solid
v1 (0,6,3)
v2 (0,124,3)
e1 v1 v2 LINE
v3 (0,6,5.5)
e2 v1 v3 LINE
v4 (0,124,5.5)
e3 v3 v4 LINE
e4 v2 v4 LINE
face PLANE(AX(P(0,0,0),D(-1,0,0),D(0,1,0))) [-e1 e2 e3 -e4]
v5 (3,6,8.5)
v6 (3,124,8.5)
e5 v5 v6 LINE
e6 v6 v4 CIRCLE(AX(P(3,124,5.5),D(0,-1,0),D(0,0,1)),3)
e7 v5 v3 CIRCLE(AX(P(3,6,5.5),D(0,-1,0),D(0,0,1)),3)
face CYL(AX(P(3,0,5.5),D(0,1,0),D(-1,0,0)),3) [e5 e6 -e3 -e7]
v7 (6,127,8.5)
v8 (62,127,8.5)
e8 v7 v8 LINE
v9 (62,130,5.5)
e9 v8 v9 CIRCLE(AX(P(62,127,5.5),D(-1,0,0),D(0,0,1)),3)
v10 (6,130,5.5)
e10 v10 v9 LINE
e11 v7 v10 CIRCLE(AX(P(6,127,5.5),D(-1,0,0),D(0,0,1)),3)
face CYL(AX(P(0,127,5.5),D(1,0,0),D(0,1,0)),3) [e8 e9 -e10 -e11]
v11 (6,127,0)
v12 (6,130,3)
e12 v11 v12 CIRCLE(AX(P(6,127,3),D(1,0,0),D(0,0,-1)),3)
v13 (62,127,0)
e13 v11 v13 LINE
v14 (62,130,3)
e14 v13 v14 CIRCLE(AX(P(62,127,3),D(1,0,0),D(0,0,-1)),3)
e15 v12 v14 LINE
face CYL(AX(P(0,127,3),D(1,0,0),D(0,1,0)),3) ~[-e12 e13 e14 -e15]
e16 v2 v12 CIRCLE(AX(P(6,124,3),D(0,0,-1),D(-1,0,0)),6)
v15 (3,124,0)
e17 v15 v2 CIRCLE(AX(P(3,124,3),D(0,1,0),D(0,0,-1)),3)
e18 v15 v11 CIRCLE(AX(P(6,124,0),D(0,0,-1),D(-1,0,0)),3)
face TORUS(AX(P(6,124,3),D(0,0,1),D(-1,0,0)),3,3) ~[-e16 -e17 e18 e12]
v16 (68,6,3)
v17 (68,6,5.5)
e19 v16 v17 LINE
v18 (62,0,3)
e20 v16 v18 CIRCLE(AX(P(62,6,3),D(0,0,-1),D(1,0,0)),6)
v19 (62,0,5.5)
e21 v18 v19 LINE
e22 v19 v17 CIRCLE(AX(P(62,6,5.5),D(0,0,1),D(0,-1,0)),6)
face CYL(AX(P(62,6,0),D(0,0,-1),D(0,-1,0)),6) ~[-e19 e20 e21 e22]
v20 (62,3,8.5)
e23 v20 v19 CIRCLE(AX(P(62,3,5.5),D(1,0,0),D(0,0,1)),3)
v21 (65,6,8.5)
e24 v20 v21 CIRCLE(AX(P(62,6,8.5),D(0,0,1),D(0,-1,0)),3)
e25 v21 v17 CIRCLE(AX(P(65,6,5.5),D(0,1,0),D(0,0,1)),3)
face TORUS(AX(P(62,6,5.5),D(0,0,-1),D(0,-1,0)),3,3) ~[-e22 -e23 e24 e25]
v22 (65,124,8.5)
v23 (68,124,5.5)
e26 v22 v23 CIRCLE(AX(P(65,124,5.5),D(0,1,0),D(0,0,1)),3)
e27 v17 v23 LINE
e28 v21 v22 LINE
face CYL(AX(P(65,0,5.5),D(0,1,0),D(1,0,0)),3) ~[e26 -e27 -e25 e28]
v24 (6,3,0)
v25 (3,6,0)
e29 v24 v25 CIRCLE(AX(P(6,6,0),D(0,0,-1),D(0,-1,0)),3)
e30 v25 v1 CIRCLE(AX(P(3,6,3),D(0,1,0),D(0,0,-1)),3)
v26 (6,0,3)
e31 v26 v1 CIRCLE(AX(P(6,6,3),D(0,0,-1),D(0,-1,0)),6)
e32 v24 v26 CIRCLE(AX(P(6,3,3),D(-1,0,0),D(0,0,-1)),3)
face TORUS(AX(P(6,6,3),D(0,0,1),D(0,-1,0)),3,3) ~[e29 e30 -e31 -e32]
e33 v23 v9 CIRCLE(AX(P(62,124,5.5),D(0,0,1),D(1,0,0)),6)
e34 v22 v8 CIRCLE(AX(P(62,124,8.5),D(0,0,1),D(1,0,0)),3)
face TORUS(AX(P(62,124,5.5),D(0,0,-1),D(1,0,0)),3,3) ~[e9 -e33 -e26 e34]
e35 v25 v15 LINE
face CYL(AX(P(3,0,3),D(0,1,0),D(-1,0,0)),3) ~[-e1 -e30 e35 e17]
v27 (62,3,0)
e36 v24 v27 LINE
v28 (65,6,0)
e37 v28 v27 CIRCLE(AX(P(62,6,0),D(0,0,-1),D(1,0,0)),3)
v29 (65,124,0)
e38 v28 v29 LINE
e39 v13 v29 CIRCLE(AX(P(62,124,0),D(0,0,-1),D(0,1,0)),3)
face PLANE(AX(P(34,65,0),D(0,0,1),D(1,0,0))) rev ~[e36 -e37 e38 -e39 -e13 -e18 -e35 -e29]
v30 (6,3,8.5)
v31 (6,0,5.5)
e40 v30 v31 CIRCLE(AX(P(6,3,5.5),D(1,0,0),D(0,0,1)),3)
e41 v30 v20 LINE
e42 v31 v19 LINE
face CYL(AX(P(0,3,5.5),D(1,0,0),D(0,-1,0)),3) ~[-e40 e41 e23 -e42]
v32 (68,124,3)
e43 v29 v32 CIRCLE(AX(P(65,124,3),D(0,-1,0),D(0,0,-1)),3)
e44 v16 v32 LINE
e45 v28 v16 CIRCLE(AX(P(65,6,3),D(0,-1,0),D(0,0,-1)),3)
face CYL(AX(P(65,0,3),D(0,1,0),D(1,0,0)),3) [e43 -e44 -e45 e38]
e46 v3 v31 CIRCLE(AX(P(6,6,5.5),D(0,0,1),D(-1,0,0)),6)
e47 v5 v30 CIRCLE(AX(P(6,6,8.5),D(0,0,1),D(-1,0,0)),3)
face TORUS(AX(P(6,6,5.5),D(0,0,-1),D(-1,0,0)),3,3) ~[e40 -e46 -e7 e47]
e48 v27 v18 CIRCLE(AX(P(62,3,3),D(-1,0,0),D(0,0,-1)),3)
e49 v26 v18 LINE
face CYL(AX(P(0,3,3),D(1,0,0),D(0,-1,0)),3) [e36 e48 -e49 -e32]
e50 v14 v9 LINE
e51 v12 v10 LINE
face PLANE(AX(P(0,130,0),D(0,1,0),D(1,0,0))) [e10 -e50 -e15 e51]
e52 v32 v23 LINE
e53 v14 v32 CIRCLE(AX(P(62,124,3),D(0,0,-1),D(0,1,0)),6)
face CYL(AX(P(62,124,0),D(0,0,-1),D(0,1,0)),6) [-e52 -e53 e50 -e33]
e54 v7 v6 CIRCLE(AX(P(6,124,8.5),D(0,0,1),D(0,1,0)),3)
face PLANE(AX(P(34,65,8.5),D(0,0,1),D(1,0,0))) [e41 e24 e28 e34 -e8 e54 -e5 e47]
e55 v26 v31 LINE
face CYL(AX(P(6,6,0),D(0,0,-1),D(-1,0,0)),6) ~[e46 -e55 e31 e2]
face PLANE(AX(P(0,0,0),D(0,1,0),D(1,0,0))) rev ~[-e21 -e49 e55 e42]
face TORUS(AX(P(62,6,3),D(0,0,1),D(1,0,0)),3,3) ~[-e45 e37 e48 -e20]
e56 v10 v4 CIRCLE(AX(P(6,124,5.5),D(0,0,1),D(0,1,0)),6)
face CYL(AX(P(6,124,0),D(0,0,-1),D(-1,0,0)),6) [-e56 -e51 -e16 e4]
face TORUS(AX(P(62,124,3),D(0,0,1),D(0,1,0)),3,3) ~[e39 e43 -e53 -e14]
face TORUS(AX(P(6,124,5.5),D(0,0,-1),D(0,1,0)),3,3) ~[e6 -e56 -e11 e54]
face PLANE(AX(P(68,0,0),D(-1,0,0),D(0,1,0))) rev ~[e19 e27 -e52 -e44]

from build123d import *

# Parameters (mm, degrees)
F0_W         = 68
F0_H         = 130
F1_DEPTH     = 8.5
F2_R         = 3
F3_T1_DEPTH  = 8.5
F3_T4_ANGLE  = 90
F3_T6_ANGLE  = 90
F3_T8_ANGLE  = 90
F3_T10_ANGLE = 90
F3_T12_ANGLE = 90
F3_T14_ANGLE = 90
F3_T16_ANGLE = 90
F3_T18_ANGLE = 90


# Not quite as in the source:
# - a fillet or chamfer that OpenCascade refuses, or shapes differently, is made with other operations: its cross-section is extruded or revolved along the edge and cut away or added


with BuildPart() as f1:
    # F0 (on Top) → F1 (new body)
    with BuildSketch(Plane.XY):
        with Locations((34, 65)):
            Rectangle(F0_W, F0_H)
    extrude(amount=F1_DEPTH)

    # F2
    f2_edges = [f1.edges().sort_by_distance(p)[0] for p in [
        (0, 65, 8.5),
        (0, 65, 0),
        (68, 65, 8.5),
        (68, 65, 0),
        (34, 0, 0),
        (34, 0, 8.5),
        (34, 130, 8.5),
        (34, 130, 0),
    ]]
    fillet(f2_edges, radius=F2_R)

    # F3: fillet of radius 6 on 4 edges, made by hand

    # F3_s2 → F3_t1 (cut)
    with BuildSketch(Plane.XY):
        with BuildLine():
            ThreePointArc((0, 6), (1.7573593129, 1.7573593129), (6, 0))
            Line((6, 0), (0, 0))
            Line((0, 0), (0, 6))
        make_face()
        with BuildLine():
            ThreePointArc((62, 0), (66.2426406871, 1.7573593129), (68, 6))
            Line((68, 6), (68, 0))
            Line((68, 0), (62, 0))
        make_face()
        with BuildLine():
            ThreePointArc((62, 130), (66.2426406871, 128.2426406871), (68, 124))
            Line((68, 124), (68, 130))
            Line((68, 130), (62, 130))
        make_face()
        with BuildLine():
            ThreePointArc((0, 124), (1.7573593129, 128.2426406871), (6, 130))
            Line((6, 130), (0, 130))
            Line((0, 130), (0, 124))
        make_face()
    extrude(amount=F3_T1_DEPTH, mode=Mode.SUBTRACT)

    # F3_s3 → F3_t4 (revolve, cut)
    with BuildSketch(Plane.XZ.offset(-124)):
        with BuildLine():
            ThreePointArc((3, 0), (0.8786796564, 0.8786796564), (0, 3))
            Line((0, 3), (0, 0))
            Line((0, 0), (3, 0))
        make_face()
    revolve(axis=Axis((6, 124, 0), (0, 0, -1)), revolution_arc=F3_T4_ANGLE, mode=Mode.SUBTRACT)

    # F3_s5 → F3_t6 (revolve, cut)
    with BuildSketch(Plane.YZ.offset(6)):
        with BuildLine():
            ThreePointArc((127, 8.5), (129.1213203436, 7.6213203436), (130, 5.5))
            Line((130, 5.5), (130, 8.5))
            Line((130, 8.5), (127, 8.5))
        make_face()
    revolve(axis=Axis((6, 124, 8.5), (0, 0, 1)), revolution_arc=F3_T6_ANGLE, mode=Mode.SUBTRACT)

    # F3_s7 → F3_t8 (revolve, cut)
    with BuildSketch(Plane.YZ.offset(62)):
        with BuildLine():
            ThreePointArc((127, 0), (129.1213203436, 0.8786796564), (130, 3))
            Line((130, 3), (130, 0))
            Line((130, 0), (127, 0))
        make_face()
    revolve(axis=Axis((62, 124, 0), (0, 0, -1)), revolution_arc=F3_T8_ANGLE, mode=Mode.SUBTRACT)

    # F3_s9 → F3_t10 (revolve, cut)
    with BuildSketch(Plane.XZ.offset(-124)):
        with BuildLine():
            ThreePointArc((65, 8.5), (67.1213203436, 7.6213203436), (68, 5.5))
            Line((68, 5.5), (68, 8.5))
            Line((68, 8.5), (65, 8.5))
        make_face()
    revolve(axis=Axis((62, 124, 8.5), (0, 0, 1)), revolution_arc=F3_T10_ANGLE, mode=Mode.SUBTRACT)

    # F3_s11 → F3_t12 (revolve, cut)
    with BuildSketch(Plane.XZ.offset(-6)):
        with BuildLine():
            ThreePointArc((65, 0), (67.1213203436, 0.8786796564), (68, 3))
            Line((68, 3), (68, 0))
            Line((68, 0), (65, 0))
        make_face()
    revolve(axis=Axis((62, 6, 0), (0, 0, -1)), revolution_arc=F3_T12_ANGLE, mode=Mode.SUBTRACT)

    # F3_s13 → F3_t14 (revolve, cut)
    with BuildSketch(Plane.YZ.offset(62)):
        with BuildLine():
            ThreePointArc((3, 8.5), (0.8786796564, 7.6213203436), (0, 5.5))
            Line((0, 5.5), (0, 8.5))
            Line((0, 8.5), (3, 8.5))
        make_face()
    revolve(axis=Axis((62, 6, 8.5), (0, 0, 1)), revolution_arc=F3_T14_ANGLE, mode=Mode.SUBTRACT)

    # F3_s15 → F3_t16 (revolve, cut)
    with BuildSketch(Plane.YZ.offset(6)):
        with BuildLine():
            ThreePointArc((3, 0), (0.8786796564, 0.8786796564), (0, 3))
            Line((0, 3), (0, 0))
            Line((0, 0), (3, 0))
        make_face()
    revolve(axis=Axis((6, 6, 0), (0, 0, -1)), revolution_arc=F3_T16_ANGLE, mode=Mode.SUBTRACT)

    # F3_s17 → F3_t18 (revolve, cut)
    with BuildSketch(Plane.XZ.offset(-6)):
        with BuildLine():
            ThreePointArc((3, 8.5), (0.8786796564, 7.6213203436), (0, 5.5))
            Line((0, 5.5), (0, 8.5))
            Line((0, 8.5), (3, 8.5))
        make_face()
    revolve(axis=Axis((6, 6, 8.5), (0, 0, 1)), revolution_arc=F3_T18_ANGLE, mode=Mode.SUBTRACT)


solid = f1.part
